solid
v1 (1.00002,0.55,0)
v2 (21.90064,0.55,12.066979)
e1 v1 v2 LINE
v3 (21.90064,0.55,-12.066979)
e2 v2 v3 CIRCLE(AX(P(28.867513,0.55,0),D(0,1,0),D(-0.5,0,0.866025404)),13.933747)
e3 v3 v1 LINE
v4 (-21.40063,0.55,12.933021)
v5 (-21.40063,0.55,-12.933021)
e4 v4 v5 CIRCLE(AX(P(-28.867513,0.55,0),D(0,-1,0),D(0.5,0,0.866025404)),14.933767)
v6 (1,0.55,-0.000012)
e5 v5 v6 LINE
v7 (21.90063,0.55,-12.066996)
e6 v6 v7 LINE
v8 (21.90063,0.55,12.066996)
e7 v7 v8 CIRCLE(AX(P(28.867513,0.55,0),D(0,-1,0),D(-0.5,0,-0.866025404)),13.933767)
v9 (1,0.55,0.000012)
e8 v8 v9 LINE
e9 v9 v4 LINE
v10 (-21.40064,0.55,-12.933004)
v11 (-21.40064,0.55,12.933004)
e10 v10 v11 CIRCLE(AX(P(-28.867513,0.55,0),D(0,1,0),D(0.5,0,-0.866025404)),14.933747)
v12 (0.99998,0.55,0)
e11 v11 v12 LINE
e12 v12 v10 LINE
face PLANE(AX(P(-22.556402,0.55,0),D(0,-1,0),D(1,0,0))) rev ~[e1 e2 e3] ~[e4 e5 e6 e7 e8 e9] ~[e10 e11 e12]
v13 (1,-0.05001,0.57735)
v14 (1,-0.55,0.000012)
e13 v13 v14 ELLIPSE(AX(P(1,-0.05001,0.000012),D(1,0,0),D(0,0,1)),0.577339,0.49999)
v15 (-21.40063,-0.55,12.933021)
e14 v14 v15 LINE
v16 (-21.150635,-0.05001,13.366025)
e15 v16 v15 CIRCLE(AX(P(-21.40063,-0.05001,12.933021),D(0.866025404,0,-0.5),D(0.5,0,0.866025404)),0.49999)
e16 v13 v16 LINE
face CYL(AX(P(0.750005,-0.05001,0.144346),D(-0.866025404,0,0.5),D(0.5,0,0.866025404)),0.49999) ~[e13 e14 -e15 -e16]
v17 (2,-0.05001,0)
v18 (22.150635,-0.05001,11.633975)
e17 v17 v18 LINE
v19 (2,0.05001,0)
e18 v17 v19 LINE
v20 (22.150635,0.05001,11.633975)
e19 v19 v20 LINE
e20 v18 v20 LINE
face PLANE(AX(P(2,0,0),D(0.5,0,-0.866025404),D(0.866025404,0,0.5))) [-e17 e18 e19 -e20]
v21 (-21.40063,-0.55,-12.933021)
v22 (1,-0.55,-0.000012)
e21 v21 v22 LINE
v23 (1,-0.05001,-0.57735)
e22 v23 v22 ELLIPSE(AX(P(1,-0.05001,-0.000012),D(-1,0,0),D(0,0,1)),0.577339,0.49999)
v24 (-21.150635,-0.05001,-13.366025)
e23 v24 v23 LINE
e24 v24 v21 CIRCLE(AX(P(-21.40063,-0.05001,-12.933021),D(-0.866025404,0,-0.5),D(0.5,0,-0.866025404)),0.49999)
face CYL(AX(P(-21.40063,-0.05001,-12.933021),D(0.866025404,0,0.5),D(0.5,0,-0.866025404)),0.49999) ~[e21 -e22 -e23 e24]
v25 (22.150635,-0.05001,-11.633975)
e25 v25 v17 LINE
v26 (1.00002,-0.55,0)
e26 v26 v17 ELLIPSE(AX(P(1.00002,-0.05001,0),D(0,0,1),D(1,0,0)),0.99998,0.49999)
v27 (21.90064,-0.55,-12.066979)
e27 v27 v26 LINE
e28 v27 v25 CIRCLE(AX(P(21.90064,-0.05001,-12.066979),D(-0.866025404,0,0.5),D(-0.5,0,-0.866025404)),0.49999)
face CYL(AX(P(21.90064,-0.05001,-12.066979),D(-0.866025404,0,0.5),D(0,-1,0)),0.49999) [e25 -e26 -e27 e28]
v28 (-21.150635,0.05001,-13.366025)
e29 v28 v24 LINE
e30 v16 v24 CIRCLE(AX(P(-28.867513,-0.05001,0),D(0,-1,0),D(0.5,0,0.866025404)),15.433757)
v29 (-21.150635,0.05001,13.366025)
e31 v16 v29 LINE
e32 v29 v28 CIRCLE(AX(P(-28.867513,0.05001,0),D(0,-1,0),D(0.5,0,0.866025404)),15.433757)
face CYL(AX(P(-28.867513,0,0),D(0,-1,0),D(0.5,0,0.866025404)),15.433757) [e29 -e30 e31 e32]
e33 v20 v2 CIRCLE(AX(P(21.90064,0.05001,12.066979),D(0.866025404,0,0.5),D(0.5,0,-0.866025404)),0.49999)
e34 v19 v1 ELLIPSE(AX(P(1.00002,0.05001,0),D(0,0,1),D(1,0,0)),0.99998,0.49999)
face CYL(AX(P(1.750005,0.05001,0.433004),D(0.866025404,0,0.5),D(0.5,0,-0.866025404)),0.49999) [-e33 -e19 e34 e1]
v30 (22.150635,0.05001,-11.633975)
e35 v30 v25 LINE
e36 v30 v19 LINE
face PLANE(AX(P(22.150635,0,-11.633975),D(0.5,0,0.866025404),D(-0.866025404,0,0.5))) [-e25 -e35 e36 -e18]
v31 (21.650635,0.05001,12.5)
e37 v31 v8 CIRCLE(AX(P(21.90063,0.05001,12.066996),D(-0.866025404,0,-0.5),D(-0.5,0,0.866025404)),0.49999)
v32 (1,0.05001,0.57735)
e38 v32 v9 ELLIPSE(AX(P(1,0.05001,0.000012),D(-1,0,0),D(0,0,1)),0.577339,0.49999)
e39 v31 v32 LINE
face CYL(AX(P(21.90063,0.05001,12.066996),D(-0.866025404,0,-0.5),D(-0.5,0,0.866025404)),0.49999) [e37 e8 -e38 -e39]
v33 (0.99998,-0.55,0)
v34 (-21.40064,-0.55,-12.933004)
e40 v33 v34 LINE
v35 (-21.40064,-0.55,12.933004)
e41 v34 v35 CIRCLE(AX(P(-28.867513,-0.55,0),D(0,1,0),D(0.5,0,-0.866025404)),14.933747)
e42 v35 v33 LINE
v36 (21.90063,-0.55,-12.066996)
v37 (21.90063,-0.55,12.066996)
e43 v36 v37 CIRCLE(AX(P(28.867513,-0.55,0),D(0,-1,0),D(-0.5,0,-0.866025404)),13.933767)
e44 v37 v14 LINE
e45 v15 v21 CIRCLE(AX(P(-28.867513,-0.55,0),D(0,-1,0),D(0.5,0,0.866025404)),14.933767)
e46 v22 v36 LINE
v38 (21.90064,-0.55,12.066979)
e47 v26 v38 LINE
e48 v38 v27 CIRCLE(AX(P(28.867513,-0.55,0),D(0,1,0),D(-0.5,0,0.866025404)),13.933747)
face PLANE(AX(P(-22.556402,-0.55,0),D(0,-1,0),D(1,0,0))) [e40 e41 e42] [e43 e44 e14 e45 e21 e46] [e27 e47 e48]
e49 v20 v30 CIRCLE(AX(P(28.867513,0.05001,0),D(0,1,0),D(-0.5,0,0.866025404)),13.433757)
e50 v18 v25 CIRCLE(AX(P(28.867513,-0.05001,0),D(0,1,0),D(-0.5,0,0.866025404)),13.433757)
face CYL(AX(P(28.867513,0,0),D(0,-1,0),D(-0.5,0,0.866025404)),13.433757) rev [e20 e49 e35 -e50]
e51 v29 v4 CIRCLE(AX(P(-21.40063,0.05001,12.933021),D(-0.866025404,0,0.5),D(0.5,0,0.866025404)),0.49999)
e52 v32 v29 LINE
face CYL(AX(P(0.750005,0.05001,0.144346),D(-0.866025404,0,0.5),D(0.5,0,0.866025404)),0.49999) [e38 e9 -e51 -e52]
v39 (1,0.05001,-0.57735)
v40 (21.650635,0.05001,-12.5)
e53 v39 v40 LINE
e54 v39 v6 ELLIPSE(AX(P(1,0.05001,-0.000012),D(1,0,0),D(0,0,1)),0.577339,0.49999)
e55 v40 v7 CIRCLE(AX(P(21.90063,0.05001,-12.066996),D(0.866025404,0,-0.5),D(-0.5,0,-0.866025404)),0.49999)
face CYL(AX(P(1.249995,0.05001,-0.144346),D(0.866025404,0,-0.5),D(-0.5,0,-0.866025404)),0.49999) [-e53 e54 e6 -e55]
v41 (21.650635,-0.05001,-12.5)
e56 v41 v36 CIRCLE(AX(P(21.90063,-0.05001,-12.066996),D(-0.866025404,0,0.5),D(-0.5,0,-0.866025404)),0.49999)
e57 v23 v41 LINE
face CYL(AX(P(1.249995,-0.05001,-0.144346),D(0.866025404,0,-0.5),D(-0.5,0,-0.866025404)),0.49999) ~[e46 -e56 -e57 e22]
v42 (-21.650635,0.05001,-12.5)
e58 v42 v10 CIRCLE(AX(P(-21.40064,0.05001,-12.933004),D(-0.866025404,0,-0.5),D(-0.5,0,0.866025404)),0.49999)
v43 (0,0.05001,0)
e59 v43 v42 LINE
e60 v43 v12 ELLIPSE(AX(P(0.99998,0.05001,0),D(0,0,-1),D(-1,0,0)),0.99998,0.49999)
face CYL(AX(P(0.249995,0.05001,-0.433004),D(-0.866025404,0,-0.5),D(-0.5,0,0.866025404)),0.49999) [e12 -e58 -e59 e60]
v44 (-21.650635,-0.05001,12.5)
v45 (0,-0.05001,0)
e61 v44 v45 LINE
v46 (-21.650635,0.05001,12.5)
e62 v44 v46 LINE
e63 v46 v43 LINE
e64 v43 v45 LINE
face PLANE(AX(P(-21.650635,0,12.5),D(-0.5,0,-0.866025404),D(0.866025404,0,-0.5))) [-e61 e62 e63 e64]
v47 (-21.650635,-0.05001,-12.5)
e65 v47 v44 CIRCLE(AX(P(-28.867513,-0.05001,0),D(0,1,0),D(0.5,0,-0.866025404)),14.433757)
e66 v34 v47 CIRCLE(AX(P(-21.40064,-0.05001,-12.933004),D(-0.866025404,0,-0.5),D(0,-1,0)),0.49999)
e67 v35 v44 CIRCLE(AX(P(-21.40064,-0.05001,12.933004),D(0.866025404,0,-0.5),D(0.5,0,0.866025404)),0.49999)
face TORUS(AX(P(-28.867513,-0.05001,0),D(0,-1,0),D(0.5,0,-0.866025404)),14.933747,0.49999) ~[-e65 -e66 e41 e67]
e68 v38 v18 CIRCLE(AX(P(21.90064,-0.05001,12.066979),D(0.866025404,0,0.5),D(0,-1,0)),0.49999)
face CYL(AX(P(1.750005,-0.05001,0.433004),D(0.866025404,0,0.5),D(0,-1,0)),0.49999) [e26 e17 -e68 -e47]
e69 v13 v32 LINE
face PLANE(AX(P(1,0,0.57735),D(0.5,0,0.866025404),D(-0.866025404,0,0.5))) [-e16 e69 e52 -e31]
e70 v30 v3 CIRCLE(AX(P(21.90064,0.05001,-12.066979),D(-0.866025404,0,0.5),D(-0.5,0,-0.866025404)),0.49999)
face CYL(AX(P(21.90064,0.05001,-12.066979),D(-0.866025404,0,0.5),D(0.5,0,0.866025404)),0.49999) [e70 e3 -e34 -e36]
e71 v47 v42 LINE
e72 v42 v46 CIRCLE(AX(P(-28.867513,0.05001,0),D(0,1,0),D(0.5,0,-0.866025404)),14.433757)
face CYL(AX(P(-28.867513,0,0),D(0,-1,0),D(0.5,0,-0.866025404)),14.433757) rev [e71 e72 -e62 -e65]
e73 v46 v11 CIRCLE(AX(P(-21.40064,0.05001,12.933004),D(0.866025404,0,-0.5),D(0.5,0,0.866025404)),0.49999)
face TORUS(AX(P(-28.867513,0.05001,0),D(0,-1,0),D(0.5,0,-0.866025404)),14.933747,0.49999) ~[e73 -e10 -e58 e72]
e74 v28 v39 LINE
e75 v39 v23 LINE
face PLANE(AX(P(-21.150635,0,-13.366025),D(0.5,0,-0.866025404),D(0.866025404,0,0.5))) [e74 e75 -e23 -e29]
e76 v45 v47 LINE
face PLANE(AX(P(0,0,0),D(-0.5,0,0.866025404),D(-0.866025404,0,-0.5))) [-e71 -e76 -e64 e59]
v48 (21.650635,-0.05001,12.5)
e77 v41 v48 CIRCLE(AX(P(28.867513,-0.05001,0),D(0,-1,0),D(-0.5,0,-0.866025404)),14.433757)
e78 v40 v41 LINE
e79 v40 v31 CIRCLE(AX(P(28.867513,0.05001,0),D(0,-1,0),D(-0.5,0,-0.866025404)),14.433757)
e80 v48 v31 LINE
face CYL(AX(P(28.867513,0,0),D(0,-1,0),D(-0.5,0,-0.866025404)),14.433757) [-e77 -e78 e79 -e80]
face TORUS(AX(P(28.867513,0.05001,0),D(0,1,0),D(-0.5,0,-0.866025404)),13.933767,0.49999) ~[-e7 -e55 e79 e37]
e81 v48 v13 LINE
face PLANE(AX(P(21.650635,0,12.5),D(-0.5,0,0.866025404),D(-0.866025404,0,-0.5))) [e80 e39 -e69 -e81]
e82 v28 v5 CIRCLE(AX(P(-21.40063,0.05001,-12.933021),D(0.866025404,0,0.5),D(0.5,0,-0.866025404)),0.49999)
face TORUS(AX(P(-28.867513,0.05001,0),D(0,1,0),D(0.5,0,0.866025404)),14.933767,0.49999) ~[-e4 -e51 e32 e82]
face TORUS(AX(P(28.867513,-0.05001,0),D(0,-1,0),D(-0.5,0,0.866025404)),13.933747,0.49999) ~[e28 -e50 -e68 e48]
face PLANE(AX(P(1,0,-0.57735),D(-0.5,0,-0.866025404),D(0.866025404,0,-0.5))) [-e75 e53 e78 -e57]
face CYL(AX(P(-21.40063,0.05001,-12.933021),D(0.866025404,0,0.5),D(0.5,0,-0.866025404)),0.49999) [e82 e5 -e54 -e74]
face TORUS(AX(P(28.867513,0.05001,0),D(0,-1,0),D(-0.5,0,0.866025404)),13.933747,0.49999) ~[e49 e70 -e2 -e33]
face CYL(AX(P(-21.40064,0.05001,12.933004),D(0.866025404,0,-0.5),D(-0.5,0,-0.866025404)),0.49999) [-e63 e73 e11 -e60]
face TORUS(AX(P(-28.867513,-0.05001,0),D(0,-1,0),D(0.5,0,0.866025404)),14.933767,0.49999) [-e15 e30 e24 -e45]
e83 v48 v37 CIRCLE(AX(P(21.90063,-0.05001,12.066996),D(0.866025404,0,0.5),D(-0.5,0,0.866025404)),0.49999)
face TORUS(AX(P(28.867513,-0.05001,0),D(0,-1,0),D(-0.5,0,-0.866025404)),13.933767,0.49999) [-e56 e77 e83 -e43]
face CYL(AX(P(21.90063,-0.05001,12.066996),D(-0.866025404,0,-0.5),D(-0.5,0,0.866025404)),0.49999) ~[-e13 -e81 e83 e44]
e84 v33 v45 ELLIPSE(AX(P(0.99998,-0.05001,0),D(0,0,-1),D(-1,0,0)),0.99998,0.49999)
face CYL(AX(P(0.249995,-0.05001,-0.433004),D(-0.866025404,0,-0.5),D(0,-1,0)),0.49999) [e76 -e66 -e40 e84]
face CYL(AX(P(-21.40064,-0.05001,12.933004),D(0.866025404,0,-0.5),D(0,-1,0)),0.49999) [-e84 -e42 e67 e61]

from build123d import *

# Parameters (mm, degrees)
F1_DEPTH = 0.55
F2_R     = 0.49999


# Not quite as in the source:
# - a fillet or chamfer is up to 0.001 mm smaller than in the source, because OpenCascade refuses the exact size


with BuildPart() as f1:
    # F0 (on Front) → F1 (new body, symmetric)
    with BuildSketch(Plane.XZ):
        with BuildLine():
            Line((1, -0.5773502692), (0, 0))
            Line((0, 0), (1, 0.5773502692))
            Line((1, 0.5773502692), (-21.1506350946, 13.3660254038))
            ThreePointArc((-21.1506350946, 13.3660254038), (-44.3012701892, 0), (-21.1506350946, -13.3660254038))
            Line((-21.1506350946, -13.3660254038), (1, -0.5773502692))
        make_face()
        with BuildLine():
            Line((0, 0), (-21.6506350946, -12.5))
            ThreePointArc((-21.6506350946, -12.5), (-43.3012701892, 0), (-21.6506350946, 12.5))
            Line((-21.6506350946, 12.5), (0, 0))
        make_face(mode=Mode.SUBTRACT)
        Polygon((1, 0.5773502692), (0, 0), (1, -0.5773502692), (2, 0), align=None)
        with BuildLine():
            Line((21.6506350946, 12.5), (1, 0.5773502692))
            Line((1, 0.5773502692), (2, 0))
            Line((2, 0), (1, -0.5773502692))
            Line((1, -0.5773502692), (21.6506350946, -12.5))
            ThreePointArc((21.6506350946, -12.5), (43.3012701892, 0), (21.6506350946, 12.5))
        make_face()
        with BuildLine():
            Line((22.1506350946, -11.6339745962), (2, 0))
            Line((2, 0), (22.1506350946, 11.6339745962))
            ThreePointArc((22.1506350946, 11.6339745962), (42.3012701892, 0), (22.1506350946, -11.6339745962))
        make_face(mode=Mode.SUBTRACT)
    extrude(amount=F1_DEPTH, both=True)

    # F2 (radius 0.5 in the source; OpenCascade refuses exactly that, so slightly less here)
    f2_edges = [f1.edges().sort_by_distance(p)[0] for p in [
        (-44.30127, -0.55, 0),
        (-10.075318, -0.55, -6.971688),
        (11.325318, -0.55, -6.538675),
        (43.30127, -0.55, 0),
        (11.325318, -0.55, 6.538675),
        (-10.075318, -0.55, 6.971688),
        (-10.825318, -0.55, 6.25),
        (-10.825318, -0.55, -6.25),
        (-43.30127, -0.55, 0),
        (12.075318, -0.55, 5.816987),
        (42.30127, -0.55, 0),
        (12.075318, -0.55, -5.816987),
        (-44.30127, 0.55, 0),
        (-10.075318, 0.55, -6.971688),
        (11.325318, 0.55, -6.538675),
        (43.30127, 0.55, 0),
        (11.325318, 0.55, 6.538675),
        (-10.075318, 0.55, 6.971688),
        (-10.825318, 0.55, 6.25),
        (-10.825318, 0.55, -6.25),
        (-43.30127, 0.55, 0),
        (12.075318, 0.55, 5.816987),
        (42.30127, 0.55, 0),
        (12.075318, 0.55, -5.816987),
    ]]
    fillet(f2_edges, radius=F2_R)


solid = f1.part
